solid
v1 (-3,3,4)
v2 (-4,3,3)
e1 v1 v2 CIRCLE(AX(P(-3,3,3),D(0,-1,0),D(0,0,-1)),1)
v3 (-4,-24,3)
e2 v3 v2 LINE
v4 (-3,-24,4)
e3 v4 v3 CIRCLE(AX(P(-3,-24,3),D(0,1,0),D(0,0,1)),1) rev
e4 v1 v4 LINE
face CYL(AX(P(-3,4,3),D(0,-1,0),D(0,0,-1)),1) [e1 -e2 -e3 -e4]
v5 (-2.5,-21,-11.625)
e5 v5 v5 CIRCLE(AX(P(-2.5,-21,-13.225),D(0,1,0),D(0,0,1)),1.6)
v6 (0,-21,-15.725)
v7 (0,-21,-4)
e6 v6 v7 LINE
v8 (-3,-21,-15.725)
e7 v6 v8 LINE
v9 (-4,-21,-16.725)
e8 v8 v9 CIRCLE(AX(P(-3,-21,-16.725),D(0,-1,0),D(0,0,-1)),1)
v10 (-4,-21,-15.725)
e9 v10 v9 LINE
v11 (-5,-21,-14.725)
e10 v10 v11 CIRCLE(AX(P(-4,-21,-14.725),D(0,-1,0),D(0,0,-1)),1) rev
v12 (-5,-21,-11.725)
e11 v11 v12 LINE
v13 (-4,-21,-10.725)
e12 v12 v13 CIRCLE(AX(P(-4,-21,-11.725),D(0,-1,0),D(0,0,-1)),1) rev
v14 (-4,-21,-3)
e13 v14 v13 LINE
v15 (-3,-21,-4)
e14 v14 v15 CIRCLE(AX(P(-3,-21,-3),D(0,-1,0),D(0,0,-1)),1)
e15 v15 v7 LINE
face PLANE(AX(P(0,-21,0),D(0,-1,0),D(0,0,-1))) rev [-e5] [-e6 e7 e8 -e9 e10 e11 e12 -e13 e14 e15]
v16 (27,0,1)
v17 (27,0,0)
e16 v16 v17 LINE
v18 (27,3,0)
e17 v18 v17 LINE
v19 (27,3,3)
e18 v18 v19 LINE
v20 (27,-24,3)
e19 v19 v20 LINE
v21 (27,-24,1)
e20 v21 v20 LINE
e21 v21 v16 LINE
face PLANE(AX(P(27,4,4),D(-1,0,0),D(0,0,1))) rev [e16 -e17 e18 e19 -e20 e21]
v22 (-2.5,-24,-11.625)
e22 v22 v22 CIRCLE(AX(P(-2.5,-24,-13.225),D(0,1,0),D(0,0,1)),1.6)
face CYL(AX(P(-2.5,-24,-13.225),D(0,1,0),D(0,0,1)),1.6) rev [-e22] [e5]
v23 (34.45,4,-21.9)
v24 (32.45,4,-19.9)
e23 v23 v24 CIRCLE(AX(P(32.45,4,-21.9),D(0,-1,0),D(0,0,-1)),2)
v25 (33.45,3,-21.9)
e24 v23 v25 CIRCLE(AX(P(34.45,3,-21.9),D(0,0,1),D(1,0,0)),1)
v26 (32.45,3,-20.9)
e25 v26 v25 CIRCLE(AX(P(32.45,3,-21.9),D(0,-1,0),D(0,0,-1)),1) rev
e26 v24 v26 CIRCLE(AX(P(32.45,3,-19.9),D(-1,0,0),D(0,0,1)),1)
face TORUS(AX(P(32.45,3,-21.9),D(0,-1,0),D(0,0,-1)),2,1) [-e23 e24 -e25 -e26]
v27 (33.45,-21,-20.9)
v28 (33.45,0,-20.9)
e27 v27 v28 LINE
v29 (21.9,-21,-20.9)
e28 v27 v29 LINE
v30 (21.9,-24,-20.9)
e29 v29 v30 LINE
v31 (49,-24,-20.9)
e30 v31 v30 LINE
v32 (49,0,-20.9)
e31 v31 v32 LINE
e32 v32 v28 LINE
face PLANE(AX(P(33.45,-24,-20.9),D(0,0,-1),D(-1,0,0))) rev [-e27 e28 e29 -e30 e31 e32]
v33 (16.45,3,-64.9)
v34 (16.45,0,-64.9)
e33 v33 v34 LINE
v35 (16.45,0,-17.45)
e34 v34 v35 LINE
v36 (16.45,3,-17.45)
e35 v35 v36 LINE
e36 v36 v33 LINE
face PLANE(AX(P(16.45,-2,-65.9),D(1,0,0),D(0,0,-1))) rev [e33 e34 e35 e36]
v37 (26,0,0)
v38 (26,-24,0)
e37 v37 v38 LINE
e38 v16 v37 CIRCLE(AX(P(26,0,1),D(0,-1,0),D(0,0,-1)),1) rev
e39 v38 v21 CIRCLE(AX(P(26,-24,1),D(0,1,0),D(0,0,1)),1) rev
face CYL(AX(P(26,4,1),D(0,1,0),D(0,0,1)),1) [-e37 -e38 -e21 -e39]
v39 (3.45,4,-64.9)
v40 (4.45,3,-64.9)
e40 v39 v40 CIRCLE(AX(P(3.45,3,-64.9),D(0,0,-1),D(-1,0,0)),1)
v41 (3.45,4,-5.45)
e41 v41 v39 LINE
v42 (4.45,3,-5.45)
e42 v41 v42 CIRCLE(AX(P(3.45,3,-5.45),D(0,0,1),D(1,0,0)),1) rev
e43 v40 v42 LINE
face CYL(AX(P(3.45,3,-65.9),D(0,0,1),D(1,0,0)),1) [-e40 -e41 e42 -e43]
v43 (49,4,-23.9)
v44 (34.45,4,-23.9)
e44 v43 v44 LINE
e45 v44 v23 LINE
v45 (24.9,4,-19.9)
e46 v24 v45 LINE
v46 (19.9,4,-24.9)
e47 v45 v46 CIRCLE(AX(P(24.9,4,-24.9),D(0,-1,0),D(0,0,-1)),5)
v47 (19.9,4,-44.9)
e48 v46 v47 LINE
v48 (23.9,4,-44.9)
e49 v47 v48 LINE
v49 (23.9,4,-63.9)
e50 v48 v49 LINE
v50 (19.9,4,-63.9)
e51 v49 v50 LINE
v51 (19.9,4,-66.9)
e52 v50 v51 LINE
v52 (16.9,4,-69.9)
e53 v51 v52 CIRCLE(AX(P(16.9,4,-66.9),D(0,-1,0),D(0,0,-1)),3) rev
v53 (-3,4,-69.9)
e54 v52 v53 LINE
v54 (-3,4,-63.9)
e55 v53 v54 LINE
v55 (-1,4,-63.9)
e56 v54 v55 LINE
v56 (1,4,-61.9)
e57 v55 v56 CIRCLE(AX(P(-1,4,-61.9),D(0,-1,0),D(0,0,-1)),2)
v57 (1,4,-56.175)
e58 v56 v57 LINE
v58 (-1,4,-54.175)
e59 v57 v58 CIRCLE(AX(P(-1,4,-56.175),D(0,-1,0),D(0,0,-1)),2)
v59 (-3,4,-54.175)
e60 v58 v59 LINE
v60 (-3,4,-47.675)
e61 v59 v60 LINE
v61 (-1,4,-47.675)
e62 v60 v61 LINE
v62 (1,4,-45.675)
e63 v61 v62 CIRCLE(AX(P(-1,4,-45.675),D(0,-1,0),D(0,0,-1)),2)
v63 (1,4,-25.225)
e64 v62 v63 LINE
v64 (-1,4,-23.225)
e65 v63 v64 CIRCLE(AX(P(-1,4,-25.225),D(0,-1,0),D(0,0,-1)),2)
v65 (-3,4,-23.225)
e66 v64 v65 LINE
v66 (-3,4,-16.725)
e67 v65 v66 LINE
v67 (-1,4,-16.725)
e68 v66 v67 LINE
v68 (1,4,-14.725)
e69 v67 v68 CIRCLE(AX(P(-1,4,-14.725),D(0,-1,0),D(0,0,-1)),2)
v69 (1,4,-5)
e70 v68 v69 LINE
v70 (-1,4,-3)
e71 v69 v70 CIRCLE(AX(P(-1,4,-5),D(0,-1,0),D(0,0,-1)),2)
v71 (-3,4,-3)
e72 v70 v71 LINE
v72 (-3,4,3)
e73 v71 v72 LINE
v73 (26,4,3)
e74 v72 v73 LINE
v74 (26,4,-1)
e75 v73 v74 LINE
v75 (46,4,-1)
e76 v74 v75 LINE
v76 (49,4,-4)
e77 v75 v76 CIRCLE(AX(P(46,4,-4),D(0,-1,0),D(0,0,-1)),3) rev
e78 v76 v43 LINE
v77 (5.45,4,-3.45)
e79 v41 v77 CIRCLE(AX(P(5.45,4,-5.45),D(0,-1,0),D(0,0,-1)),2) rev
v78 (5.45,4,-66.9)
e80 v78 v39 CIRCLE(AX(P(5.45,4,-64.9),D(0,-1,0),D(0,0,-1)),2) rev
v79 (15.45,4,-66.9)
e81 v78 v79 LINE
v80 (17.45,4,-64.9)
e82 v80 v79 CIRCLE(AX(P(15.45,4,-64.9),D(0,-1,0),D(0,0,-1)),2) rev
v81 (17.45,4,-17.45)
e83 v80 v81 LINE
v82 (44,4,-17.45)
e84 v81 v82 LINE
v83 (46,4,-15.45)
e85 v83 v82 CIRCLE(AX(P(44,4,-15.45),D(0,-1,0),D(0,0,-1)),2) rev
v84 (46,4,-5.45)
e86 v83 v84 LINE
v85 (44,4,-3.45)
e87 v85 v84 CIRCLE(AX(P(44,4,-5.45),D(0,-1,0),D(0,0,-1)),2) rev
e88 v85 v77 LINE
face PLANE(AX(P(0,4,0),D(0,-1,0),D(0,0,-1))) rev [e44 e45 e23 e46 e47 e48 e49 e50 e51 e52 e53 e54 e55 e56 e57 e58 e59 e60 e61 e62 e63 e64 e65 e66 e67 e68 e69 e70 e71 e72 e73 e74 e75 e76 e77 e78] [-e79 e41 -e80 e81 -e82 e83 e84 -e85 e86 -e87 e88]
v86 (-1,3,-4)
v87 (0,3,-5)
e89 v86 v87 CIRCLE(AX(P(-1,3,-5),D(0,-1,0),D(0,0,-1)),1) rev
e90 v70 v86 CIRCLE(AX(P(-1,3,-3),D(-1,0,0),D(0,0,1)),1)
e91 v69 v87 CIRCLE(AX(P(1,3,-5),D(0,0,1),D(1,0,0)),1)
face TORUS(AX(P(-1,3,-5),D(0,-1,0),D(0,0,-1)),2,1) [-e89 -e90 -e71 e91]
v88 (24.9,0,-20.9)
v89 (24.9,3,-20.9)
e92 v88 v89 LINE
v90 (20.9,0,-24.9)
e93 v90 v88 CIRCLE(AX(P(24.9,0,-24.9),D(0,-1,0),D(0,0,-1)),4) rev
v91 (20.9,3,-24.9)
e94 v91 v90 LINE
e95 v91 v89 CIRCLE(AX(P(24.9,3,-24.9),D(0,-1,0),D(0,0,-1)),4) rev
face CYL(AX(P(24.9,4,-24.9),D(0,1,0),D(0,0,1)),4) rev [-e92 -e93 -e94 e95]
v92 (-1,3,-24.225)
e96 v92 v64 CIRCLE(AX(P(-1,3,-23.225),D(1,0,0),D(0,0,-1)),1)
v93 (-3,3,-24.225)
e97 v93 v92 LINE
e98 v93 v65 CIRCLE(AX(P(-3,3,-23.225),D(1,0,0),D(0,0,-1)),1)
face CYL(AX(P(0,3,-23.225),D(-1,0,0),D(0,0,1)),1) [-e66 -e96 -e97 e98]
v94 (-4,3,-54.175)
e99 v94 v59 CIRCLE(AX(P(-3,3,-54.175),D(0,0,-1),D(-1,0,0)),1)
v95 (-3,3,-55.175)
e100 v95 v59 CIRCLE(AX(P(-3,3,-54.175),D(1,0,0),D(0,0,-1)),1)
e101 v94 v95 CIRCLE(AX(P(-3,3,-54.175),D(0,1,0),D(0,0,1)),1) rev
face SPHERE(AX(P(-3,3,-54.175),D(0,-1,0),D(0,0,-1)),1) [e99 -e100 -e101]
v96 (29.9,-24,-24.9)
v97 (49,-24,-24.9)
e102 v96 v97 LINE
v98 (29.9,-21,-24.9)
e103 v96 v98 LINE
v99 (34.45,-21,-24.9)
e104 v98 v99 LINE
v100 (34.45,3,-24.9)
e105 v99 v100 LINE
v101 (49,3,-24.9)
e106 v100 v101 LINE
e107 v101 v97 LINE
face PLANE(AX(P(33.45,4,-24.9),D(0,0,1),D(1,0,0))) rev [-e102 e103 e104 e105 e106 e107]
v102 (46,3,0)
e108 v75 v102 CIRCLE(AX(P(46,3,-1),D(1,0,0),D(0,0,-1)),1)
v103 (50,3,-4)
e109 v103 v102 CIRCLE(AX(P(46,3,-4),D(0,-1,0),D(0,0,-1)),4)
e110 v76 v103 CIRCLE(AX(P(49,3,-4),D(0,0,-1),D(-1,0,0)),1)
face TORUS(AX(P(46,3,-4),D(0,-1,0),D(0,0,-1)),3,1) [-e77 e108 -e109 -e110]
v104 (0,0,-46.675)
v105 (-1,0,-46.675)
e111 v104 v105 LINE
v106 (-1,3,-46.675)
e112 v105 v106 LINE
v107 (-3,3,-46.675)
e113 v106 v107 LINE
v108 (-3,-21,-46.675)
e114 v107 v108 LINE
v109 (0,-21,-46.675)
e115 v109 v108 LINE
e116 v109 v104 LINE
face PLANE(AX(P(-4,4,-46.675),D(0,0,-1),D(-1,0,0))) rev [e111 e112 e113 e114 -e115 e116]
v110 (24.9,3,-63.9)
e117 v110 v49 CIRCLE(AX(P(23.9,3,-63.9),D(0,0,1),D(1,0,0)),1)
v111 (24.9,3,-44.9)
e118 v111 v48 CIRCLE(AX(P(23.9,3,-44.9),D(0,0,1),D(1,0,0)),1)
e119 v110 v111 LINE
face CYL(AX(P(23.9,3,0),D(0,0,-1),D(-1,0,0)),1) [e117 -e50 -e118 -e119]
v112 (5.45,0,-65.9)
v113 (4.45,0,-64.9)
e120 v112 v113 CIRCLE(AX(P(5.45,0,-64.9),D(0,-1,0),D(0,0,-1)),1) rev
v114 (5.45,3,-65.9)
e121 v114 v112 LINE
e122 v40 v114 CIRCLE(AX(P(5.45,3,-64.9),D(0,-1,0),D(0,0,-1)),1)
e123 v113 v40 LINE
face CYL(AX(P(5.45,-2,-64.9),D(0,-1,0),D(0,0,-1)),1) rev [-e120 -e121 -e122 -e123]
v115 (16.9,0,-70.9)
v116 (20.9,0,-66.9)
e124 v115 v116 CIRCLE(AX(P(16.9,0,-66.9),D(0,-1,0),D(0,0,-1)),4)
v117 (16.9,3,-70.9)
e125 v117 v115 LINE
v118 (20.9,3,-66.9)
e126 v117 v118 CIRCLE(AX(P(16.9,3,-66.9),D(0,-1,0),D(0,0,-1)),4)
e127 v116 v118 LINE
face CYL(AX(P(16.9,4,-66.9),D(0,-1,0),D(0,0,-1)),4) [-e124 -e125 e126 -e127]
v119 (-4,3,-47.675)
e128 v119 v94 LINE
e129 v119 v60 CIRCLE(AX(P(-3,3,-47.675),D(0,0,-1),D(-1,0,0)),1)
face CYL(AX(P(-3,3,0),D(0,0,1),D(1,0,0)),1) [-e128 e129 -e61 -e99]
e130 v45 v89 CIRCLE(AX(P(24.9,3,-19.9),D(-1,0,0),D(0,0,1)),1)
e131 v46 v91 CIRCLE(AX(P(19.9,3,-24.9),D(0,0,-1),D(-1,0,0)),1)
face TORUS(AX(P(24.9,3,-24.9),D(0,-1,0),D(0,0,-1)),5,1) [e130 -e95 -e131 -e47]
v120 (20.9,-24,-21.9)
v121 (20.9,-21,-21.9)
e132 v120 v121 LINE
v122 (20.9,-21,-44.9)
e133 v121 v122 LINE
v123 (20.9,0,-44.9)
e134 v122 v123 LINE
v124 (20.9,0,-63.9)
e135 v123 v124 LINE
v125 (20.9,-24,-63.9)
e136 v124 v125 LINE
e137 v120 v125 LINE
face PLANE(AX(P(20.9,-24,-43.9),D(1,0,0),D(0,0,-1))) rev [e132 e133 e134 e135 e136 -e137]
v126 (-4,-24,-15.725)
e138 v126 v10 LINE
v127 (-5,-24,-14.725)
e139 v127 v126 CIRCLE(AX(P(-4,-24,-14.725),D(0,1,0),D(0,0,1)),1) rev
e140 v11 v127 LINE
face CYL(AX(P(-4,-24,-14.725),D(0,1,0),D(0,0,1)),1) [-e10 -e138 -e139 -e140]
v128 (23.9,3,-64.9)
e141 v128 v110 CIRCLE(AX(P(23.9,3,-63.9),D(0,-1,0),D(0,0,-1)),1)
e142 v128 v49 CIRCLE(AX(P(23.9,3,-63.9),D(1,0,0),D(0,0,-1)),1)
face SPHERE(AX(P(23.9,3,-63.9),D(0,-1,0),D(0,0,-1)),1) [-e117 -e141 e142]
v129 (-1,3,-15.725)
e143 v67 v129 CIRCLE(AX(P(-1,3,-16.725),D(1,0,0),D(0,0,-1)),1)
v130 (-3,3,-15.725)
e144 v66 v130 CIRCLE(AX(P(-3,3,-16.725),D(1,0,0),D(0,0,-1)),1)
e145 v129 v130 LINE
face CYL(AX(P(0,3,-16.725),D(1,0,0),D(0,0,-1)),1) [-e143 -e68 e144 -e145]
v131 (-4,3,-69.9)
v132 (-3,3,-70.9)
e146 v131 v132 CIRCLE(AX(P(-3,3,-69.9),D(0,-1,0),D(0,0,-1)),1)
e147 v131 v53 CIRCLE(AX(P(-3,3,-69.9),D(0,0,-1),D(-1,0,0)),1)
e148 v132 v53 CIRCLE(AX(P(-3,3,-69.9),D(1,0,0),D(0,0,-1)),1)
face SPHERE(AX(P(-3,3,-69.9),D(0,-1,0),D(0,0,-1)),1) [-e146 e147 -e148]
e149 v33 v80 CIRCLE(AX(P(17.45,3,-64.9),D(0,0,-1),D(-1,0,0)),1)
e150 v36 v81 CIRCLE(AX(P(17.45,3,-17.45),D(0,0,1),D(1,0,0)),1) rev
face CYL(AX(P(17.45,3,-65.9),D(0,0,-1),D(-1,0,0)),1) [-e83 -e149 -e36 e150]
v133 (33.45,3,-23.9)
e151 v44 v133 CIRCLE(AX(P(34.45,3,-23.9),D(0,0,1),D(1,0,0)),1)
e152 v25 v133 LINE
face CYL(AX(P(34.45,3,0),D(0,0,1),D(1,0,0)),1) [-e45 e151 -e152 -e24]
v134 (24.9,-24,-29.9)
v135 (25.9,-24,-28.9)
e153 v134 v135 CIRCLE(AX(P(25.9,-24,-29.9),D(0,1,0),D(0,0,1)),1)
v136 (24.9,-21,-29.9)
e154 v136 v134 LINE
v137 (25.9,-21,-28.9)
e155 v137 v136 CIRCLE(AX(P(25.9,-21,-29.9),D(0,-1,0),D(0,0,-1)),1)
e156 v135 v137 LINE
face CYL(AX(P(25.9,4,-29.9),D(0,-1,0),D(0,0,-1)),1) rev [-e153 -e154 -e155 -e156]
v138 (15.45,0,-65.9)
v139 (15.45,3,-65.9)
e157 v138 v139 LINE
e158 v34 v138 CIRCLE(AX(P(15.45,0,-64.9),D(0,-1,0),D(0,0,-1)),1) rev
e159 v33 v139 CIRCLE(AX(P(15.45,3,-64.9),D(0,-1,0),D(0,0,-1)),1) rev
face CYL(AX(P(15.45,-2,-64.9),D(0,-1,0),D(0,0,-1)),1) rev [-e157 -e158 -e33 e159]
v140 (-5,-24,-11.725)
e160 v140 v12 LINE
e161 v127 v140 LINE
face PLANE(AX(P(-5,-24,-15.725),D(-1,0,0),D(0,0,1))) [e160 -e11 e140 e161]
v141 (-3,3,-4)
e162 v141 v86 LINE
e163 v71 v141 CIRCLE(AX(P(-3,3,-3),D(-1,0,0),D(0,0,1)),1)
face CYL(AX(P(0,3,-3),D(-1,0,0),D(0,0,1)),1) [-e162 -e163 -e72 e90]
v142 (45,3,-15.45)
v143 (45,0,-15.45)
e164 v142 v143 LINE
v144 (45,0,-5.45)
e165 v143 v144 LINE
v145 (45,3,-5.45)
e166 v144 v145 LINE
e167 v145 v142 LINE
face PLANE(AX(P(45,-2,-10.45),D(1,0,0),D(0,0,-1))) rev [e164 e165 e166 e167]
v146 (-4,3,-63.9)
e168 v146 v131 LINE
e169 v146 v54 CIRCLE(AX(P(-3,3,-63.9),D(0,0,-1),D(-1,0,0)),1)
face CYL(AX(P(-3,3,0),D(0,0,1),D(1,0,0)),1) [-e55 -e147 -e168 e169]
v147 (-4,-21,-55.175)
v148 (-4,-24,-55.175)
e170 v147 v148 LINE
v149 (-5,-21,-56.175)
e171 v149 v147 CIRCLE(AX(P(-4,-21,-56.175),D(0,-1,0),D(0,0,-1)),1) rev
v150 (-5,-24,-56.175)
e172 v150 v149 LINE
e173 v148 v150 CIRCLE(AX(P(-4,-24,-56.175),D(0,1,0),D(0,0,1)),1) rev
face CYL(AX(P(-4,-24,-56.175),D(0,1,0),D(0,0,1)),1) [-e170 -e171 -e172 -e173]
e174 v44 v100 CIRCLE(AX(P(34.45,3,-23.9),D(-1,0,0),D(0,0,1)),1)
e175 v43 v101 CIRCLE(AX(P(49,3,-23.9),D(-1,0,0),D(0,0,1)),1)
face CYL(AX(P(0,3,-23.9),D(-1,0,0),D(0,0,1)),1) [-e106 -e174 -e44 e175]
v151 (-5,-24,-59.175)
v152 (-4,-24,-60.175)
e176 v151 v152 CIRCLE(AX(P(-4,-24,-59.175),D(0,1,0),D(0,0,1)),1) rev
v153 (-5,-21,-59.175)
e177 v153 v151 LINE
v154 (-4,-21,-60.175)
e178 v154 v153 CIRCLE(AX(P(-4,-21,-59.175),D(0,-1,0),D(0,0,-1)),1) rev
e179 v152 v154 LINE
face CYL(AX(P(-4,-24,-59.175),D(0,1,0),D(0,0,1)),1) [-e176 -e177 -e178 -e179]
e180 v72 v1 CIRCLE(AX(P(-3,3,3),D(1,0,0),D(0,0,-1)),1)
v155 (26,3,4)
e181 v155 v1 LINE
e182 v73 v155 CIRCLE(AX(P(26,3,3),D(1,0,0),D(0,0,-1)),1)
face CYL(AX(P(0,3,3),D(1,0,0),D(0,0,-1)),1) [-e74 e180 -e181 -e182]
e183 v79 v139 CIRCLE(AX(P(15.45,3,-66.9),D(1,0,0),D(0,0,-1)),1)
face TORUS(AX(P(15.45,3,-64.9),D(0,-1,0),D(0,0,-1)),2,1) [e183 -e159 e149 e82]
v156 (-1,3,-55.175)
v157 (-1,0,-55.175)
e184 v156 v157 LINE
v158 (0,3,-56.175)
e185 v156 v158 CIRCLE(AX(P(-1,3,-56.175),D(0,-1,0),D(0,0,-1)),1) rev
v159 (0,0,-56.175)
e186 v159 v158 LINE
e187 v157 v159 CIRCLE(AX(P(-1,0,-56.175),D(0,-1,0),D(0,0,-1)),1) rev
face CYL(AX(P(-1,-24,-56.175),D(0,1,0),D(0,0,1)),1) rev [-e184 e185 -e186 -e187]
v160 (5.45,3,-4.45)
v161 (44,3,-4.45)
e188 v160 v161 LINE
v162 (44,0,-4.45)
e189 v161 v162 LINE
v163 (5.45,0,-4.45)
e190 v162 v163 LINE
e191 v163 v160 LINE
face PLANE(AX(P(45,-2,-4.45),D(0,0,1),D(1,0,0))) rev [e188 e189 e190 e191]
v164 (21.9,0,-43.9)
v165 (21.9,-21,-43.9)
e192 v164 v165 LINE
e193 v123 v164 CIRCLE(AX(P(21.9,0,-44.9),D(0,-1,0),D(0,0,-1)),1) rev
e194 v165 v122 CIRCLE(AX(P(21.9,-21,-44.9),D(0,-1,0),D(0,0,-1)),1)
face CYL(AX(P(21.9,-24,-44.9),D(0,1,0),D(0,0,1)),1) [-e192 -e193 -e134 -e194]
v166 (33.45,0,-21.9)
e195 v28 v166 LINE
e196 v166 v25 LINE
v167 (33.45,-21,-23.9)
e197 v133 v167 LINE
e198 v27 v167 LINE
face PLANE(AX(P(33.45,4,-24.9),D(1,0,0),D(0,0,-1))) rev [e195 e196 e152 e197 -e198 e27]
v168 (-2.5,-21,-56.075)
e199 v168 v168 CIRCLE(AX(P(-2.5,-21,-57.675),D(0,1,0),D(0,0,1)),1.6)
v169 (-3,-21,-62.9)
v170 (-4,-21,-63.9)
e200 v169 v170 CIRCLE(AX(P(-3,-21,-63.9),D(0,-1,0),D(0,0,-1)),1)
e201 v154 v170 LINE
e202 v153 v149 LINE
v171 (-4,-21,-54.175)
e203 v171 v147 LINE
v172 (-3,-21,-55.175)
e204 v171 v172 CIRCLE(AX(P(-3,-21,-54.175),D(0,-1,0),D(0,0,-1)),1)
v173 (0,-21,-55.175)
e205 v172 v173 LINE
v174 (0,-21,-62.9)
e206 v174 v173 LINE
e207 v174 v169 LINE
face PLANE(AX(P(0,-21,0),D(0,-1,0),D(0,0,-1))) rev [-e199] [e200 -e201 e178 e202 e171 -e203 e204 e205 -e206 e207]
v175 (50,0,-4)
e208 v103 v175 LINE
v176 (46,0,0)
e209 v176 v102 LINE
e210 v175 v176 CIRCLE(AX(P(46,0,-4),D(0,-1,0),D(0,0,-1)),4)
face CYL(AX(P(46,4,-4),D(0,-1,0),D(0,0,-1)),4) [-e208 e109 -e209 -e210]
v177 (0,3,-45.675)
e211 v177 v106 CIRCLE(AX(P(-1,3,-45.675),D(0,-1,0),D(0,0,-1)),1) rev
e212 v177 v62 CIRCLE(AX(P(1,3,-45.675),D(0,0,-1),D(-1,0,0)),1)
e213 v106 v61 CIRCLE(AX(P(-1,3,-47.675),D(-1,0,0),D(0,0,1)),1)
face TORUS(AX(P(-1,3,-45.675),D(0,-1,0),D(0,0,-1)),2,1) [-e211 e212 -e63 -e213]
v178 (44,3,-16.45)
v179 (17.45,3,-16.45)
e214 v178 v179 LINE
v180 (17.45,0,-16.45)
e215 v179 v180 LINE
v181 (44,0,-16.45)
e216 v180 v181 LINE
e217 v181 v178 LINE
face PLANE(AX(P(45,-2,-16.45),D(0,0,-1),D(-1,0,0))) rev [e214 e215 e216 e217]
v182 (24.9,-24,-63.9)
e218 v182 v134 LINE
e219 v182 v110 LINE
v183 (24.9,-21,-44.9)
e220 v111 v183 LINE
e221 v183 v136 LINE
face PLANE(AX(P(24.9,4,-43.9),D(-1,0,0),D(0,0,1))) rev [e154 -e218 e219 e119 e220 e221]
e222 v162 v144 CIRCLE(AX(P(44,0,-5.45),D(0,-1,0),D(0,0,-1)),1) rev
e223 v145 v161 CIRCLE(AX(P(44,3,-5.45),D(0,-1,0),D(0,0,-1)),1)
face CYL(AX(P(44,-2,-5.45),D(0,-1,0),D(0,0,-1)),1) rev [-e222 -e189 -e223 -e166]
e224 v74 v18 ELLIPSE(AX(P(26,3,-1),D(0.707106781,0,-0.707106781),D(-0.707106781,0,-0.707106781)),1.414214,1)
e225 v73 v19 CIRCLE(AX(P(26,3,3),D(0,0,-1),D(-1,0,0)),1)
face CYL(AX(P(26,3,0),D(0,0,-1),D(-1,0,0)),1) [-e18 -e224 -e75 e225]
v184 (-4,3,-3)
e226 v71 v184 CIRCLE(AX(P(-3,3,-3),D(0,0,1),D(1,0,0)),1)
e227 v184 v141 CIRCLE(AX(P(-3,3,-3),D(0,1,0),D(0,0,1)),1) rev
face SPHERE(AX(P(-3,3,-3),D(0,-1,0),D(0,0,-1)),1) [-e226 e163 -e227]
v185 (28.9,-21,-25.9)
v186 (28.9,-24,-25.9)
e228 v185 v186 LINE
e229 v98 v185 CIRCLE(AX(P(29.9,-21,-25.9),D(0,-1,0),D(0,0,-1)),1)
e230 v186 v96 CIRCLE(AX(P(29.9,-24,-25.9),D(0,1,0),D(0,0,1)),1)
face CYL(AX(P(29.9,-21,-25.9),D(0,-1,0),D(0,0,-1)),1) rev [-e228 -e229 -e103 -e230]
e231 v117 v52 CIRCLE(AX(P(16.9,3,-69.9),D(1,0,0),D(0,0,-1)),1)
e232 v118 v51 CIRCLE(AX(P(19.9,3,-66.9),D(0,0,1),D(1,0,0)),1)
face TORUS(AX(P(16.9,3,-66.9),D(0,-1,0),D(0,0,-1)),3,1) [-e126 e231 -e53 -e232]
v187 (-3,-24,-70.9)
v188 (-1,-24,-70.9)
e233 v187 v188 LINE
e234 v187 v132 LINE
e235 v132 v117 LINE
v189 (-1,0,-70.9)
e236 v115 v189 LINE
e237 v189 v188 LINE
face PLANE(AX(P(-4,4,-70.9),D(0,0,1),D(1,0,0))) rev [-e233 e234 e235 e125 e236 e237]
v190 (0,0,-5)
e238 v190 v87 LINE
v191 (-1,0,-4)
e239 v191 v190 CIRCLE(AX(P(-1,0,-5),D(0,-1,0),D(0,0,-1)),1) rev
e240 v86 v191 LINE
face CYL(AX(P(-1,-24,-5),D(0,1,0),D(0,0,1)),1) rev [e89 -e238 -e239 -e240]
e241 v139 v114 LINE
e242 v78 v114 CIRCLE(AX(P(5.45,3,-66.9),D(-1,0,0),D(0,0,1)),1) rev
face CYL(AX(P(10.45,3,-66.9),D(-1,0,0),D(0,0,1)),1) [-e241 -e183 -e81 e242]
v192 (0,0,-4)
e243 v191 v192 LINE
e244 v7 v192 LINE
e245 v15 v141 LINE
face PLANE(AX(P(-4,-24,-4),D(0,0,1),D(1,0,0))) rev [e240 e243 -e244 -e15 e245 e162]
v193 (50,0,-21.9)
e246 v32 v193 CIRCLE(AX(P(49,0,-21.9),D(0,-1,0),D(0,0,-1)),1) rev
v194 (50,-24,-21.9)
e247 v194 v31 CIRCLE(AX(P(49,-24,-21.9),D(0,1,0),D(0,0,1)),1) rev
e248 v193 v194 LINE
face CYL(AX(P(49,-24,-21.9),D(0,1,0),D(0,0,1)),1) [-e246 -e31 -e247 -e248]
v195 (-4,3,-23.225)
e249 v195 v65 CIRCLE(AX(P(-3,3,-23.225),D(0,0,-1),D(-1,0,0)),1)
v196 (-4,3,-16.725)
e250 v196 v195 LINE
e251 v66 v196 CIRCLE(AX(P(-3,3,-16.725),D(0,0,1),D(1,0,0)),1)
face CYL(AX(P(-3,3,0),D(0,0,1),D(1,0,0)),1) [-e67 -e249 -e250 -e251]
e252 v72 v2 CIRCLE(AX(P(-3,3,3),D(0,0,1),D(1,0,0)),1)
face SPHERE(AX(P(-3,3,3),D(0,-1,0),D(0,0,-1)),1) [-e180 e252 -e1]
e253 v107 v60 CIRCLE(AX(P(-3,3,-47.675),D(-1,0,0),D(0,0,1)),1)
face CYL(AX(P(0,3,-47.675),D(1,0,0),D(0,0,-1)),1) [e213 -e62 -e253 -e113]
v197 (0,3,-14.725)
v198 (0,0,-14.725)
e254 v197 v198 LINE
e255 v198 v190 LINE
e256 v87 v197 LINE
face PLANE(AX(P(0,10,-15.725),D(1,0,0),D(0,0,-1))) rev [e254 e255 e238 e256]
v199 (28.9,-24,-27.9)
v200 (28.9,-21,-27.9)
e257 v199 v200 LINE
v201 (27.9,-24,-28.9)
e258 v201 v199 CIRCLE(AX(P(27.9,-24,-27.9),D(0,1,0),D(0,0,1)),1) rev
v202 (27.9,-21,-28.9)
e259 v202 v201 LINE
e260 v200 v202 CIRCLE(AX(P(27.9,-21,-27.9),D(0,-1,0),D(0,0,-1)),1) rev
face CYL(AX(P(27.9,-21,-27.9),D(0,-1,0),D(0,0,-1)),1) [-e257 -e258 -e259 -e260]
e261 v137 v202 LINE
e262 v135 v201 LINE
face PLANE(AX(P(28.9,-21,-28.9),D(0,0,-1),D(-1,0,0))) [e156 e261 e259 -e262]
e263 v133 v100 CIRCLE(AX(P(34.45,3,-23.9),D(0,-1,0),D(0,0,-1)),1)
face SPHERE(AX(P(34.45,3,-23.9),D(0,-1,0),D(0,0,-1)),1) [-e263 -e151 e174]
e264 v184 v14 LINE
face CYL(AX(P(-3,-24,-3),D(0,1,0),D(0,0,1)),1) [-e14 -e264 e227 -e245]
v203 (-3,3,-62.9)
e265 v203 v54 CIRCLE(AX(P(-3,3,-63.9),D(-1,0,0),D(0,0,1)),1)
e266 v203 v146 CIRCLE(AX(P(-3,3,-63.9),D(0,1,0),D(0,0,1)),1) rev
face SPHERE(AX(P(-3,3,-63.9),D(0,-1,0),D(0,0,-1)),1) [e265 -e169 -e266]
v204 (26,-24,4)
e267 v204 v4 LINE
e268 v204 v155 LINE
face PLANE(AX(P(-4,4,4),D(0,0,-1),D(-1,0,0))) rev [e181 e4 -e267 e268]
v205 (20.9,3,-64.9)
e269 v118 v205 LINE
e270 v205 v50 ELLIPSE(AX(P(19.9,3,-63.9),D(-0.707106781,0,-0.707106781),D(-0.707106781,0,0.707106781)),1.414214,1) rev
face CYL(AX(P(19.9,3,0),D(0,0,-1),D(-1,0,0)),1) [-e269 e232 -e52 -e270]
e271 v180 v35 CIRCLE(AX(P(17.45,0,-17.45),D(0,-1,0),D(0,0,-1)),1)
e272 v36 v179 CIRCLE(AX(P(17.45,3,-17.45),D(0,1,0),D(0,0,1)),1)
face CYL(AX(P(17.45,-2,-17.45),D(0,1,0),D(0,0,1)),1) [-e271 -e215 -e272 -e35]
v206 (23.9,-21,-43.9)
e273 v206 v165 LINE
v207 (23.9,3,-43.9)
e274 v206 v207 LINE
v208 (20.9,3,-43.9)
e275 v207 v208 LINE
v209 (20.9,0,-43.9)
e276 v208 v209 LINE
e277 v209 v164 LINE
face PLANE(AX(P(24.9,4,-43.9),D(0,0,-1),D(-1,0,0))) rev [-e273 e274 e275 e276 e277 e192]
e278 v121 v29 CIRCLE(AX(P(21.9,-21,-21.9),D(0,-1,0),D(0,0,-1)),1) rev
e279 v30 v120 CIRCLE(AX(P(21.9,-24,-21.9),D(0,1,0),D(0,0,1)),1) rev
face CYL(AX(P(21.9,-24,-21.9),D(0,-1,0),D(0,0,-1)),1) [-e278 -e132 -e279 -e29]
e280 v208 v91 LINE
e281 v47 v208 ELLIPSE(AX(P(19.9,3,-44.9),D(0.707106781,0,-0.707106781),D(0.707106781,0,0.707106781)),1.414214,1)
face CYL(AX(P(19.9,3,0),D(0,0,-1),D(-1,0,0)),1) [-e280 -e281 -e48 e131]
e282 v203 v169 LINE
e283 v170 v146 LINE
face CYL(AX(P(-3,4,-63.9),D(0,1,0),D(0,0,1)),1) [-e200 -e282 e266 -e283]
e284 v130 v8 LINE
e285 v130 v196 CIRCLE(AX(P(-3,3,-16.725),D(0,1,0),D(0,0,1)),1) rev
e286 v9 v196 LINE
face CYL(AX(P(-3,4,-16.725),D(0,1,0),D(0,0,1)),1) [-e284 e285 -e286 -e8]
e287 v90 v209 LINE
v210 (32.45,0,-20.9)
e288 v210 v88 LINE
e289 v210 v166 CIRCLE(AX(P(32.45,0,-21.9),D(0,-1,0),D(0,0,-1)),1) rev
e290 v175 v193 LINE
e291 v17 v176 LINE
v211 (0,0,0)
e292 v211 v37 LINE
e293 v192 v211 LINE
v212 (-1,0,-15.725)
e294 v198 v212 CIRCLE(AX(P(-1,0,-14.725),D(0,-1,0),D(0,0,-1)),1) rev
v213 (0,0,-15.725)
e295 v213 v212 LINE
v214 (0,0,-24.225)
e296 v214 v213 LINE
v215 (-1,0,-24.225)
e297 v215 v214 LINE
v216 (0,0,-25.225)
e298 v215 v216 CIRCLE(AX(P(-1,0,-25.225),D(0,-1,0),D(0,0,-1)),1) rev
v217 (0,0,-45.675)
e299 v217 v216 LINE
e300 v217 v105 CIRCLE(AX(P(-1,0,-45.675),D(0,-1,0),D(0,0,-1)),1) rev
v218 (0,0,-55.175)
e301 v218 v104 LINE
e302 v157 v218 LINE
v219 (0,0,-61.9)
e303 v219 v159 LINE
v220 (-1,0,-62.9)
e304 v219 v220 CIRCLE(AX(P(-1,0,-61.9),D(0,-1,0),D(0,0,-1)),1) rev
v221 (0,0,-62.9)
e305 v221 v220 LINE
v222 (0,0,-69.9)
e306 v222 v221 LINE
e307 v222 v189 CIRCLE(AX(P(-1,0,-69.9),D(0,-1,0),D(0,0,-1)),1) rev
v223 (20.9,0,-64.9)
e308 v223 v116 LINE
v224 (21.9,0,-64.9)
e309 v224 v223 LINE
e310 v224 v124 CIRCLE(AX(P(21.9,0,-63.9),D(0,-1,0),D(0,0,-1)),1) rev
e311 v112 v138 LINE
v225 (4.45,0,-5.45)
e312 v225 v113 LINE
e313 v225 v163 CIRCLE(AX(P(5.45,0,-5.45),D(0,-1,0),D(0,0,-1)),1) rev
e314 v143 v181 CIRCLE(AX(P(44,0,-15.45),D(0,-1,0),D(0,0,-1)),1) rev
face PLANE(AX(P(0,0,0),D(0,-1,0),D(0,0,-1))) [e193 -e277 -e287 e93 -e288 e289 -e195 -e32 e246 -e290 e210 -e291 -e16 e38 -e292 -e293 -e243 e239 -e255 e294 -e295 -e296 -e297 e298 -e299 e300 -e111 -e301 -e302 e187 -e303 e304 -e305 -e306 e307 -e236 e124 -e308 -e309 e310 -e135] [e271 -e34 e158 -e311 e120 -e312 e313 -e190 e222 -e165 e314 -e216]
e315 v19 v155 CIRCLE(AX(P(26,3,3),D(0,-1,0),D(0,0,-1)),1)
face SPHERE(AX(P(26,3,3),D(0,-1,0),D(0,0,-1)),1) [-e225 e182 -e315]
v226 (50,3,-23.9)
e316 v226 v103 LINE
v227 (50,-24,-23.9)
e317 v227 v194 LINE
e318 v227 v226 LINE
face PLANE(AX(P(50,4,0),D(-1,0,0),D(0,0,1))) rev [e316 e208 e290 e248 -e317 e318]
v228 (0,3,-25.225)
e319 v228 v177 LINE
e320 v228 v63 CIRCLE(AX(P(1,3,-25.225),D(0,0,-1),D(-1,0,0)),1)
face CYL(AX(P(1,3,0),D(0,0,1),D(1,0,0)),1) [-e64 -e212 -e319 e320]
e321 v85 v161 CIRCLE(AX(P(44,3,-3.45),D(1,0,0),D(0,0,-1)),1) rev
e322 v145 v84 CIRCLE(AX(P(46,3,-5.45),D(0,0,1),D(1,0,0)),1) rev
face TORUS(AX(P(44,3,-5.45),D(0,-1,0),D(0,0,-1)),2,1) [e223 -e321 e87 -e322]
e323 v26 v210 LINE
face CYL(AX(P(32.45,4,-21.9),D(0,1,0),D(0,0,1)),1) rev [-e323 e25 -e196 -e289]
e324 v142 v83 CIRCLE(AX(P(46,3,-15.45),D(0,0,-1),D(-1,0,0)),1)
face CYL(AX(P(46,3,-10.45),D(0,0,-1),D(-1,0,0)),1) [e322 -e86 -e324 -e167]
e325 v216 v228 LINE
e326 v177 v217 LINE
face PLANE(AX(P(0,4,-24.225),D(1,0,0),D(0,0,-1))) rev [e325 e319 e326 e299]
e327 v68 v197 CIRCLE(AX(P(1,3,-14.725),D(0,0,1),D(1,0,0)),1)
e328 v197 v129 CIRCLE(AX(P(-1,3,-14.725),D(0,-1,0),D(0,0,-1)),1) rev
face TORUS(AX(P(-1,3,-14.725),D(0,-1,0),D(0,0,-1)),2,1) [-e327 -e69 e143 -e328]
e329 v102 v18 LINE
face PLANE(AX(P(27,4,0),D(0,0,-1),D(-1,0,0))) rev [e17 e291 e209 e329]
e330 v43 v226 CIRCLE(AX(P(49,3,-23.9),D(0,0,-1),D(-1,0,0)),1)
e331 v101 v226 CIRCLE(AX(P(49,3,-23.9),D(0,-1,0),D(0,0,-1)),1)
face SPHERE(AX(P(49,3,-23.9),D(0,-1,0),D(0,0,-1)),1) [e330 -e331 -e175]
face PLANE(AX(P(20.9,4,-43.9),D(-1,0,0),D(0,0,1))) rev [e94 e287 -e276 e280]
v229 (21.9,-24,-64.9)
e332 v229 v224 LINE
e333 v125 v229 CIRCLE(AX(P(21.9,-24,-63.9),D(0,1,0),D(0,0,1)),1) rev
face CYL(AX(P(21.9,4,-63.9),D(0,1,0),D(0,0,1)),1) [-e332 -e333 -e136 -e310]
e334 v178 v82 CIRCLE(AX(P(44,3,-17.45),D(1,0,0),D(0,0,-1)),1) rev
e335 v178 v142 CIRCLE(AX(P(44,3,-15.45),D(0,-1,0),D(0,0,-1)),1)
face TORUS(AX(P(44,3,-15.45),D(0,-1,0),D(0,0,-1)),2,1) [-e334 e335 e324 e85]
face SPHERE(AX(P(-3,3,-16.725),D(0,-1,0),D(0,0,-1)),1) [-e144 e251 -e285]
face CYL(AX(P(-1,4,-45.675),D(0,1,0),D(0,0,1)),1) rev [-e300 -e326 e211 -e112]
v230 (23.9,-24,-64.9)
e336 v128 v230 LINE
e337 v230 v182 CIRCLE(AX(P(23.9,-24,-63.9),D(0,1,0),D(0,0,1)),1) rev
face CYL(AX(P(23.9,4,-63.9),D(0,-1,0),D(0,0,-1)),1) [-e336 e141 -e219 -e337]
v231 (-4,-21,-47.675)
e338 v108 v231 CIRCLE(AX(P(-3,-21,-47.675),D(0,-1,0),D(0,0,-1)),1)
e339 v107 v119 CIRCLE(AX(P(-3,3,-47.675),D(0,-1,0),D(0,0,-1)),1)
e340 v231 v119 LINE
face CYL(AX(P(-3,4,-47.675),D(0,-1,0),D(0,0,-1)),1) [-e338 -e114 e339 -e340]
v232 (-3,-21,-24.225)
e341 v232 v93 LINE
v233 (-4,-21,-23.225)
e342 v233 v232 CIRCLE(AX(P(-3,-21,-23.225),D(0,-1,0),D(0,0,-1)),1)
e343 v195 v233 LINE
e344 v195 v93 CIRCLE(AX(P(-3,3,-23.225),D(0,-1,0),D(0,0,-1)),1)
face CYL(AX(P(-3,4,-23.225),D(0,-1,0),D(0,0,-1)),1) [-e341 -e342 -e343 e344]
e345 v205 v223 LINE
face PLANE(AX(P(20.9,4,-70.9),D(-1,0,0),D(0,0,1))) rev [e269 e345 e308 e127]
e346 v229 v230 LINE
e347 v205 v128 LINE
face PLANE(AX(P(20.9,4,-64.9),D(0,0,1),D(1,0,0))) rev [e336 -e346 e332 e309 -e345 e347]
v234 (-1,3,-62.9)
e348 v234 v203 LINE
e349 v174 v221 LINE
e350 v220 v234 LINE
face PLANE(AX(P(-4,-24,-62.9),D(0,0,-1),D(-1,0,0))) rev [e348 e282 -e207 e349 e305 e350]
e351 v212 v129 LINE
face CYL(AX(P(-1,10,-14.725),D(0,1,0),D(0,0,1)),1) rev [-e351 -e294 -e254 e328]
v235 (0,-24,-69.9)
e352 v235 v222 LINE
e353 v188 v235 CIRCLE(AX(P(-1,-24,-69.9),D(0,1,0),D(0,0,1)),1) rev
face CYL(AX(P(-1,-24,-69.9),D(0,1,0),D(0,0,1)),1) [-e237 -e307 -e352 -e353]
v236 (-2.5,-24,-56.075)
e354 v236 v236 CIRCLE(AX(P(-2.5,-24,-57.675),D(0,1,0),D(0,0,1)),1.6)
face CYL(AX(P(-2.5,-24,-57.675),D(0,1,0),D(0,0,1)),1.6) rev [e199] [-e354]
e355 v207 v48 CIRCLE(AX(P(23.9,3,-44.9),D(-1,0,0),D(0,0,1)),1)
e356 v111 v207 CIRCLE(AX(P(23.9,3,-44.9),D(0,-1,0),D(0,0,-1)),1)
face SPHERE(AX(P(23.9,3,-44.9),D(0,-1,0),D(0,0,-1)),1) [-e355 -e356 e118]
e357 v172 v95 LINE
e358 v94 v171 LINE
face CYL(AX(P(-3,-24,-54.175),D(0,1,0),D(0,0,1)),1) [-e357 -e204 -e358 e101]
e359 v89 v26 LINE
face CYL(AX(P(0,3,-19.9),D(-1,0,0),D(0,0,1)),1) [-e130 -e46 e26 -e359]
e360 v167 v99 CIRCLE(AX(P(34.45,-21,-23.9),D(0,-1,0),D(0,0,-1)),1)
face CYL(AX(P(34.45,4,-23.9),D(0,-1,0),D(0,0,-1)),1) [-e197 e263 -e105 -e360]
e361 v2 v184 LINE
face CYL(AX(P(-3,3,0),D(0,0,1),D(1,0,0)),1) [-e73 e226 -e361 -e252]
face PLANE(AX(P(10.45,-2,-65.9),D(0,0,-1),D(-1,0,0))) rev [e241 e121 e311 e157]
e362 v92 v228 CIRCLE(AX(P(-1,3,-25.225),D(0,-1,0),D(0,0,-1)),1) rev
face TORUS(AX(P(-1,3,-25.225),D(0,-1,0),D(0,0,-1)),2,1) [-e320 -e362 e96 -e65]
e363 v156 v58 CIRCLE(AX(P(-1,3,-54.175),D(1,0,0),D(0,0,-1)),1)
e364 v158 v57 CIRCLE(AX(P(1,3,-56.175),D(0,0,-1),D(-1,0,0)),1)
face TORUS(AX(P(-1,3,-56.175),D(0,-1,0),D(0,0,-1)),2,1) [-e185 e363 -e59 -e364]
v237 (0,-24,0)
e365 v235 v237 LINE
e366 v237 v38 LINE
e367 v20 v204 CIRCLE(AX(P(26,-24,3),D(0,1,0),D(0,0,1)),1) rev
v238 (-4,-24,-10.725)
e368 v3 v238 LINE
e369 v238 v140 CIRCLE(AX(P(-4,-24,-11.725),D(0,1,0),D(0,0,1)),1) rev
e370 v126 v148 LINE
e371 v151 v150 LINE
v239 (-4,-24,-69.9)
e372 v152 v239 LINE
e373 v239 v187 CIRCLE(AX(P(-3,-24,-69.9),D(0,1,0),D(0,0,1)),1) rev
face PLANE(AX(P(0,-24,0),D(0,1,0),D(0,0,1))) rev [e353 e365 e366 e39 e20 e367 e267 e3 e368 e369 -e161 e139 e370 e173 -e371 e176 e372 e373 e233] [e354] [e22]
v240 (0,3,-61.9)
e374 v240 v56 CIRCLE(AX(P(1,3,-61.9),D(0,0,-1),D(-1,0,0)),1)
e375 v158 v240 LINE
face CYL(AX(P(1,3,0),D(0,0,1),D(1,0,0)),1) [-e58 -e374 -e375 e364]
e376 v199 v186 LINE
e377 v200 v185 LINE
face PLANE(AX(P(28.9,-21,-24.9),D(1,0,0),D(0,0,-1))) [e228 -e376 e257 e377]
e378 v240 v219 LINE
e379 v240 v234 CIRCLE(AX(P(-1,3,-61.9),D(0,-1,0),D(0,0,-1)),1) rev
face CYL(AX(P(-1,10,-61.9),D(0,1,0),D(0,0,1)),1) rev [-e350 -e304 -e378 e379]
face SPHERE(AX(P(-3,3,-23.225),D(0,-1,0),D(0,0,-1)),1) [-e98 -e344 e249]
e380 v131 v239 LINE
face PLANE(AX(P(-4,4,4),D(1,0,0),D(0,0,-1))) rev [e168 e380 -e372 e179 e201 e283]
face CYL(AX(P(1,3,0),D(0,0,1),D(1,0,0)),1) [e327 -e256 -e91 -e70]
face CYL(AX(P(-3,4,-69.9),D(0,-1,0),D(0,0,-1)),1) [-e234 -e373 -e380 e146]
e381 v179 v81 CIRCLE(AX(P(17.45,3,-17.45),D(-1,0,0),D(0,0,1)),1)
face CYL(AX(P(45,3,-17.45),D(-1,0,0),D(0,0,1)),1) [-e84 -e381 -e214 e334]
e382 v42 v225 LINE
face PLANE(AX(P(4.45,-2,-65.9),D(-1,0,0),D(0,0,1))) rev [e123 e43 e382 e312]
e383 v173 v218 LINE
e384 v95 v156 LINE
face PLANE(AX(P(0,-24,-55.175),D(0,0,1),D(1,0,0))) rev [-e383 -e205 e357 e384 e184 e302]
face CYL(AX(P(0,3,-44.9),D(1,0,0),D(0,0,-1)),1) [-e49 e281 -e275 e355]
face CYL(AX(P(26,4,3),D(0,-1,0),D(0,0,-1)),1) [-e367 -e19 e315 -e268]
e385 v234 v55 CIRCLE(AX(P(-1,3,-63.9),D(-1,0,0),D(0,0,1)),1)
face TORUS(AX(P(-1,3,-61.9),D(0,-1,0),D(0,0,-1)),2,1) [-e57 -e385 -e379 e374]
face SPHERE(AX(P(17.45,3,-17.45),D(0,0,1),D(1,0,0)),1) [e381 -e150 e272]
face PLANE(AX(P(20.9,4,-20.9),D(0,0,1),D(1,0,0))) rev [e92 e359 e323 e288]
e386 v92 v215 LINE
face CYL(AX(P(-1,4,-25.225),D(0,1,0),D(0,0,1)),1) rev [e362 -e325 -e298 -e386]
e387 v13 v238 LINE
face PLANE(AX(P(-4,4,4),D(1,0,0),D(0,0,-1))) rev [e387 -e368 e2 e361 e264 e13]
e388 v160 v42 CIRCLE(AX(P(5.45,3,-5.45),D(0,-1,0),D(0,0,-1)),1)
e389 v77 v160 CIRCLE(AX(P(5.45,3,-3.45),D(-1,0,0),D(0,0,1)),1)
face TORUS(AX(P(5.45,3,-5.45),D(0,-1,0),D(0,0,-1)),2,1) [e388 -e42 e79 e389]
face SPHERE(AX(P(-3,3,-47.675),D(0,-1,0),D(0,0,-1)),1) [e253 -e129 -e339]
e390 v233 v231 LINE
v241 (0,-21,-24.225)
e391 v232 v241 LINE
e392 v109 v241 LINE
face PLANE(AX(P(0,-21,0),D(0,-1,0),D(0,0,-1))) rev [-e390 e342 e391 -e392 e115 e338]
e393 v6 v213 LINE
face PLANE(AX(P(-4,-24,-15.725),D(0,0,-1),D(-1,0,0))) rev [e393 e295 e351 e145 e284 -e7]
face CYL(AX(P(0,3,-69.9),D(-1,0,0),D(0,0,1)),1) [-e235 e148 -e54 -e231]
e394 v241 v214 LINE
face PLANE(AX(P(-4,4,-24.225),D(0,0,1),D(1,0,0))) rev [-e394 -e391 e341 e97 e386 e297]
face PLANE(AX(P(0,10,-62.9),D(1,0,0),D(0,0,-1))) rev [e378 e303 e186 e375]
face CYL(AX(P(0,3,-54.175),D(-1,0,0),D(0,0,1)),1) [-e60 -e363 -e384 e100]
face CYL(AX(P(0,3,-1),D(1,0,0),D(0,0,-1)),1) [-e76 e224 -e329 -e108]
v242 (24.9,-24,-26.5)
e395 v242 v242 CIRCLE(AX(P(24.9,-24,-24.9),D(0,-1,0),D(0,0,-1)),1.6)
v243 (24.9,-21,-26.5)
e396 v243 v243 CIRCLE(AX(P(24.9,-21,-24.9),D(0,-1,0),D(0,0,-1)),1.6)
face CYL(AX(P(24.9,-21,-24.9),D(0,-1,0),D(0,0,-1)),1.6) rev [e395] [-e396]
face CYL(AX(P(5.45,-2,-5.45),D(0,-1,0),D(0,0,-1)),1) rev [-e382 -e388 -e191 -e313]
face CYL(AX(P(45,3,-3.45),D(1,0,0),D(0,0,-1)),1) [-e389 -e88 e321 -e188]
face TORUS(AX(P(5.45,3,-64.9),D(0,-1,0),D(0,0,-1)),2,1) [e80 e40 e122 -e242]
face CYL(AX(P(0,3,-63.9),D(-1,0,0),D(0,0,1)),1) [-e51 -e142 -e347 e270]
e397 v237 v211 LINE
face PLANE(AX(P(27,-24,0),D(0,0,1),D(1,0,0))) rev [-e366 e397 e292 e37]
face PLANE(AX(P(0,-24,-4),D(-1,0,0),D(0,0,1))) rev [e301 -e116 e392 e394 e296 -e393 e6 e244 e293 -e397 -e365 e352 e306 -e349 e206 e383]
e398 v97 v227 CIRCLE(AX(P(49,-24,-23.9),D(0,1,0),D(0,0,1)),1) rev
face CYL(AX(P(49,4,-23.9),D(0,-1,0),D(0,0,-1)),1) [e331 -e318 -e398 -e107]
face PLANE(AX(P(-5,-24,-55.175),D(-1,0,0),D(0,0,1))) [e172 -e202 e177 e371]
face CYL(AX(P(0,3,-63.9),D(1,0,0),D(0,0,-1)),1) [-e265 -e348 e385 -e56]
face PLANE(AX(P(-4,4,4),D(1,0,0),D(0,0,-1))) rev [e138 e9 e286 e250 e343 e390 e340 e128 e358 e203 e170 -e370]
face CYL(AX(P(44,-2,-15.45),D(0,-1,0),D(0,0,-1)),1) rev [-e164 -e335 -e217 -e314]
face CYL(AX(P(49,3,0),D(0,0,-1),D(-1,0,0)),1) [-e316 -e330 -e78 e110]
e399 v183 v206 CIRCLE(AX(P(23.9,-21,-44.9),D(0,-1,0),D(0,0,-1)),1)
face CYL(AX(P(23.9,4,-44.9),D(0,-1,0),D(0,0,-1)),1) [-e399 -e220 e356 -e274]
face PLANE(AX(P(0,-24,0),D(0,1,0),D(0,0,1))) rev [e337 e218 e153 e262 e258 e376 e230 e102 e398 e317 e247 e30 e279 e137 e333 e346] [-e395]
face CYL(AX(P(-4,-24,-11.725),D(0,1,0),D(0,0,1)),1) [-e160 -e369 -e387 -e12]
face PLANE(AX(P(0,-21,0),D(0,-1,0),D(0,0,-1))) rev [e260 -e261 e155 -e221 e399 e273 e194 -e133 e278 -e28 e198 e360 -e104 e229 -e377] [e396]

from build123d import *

# Parameters (mm, degrees)
BOSS_EXTRUDE1_DEPTH = 4
SKETCH2_W           = 16.55
SKETCH2_H           = 4
SKETCH2_W_2         = 4
SKETCH2_H_2         = 21
SKETCH2_H_3         = 8.5
SKETCH2_H_4         = 8
BOSS_EXTRUDE2_DEPTH = 24
FILLET2_R           = 4
BOSS_EXTRUDE3_DEPTH = 3
SKETCH7_R           = 1.6
BOSS_EXTRUDE4_DEPTH = 3
SKETCH8_W           = 5
SKETCH8_H           = 5
BOSS_EXTRUDE5_DEPTH = 3
SKETCH9_R           = 1.6
CUT_EXTRUDE1_DEPTH  = 3
CUT_EXTRUDE2_DEPTH  = 6
SKETCH11_W          = 4
SKETCH11_H          = 11.725
SKETCH11_H_2        = 7.725
CUT_EXTRUDE3_DEPTH  = 10
FILLET3_R           = 1
FILLET4_R           = 1
FILLET5_R           = 1
FILLET6_R           = 1


with BuildPart() as part:
    # Sketch1 → Boss-Extrude1 (new body)
    with BuildSketch(Plane(origin=(0, 0, 0), x_dir=(1, 0, 0), z_dir=(0, 1, 0))):
        Polygon((20.9, 20.9), (33.45, 20.9), (33.45, 24.9), (50, 24.9), (50, 0), (27, 0), (27, -4), (-4, -4), (-4, 19.725), (-4, 24.225), (0, 24.225), (0, 35.45), (0, 46.675), (-4, 46.675), (-4, 51.175), (-4, 70.9), (20.9, 70.9), (20.9, 64.9), (24.9, 64.9), (24.9, 43.9), (20.9, 43.9), align=None)
    extrude(amount=BOSS_EXTRUDE1_DEPTH)

    # Sketch2 → Boss-Extrude2 (add)
    with BuildSketch(Plane.XZ):
        Polygon((27, 0), (23, 0), (0, 0), (0, -4), (-4, -4), (-4, 4), (23, 4), (27, 4), align=None)
        with Locations((41.725, -22.9)):
            Rectangle(SKETCH2_W, SKETCH2_H)
        with Locations((22.9, -54.4)):
            Rectangle(SKETCH2_W_2, SKETCH2_H_2)
        with Locations((-2, -19.975)):
            Rectangle(SKETCH2_W_2, SKETCH2_H_3)
        with Locations((-2, -50.925)):
            Rectangle(SKETCH2_W_2, SKETCH2_H_3)
        with Locations((-2, -66.9)):
            Rectangle(SKETCH2_W_2, SKETCH2_H_4)
    extrude(amount=BOSS_EXTRUDE2_DEPTH)

    # Fillet2
    fillet2_edges = [part.edges().sort_by_distance(p)[0] for p in [
        (20.9, 2, -20.9),
        (50, 2, 0),
        (20.9, 2, -70.9),
    ]]
    fillet(fillet2_edges, radius=FILLET2_R)

    # Sketch5 → Boss-Extrude3 (add)
    with BuildSketch(Plane(origin=(0, -24, 0), x_dir=(-1, 0, 0), z_dir=(0, -1, 0))):
        Polygon((0, 19.725), (0, 0), (-27, 0), (-27, -4), (4, -4), (4, 51.175), (4, 70.9), (0, 70.9), align=None)
    extrude(amount=-BOSS_EXTRUDE3_DEPTH)

    # Sketch7 → Boss-Extrude4 (add)
    with BuildSketch(Plane.XZ.offset(24)):
        Polygon((24.9, -47.9), (24.9, -34.9), (24.9, -28.9), (28.9, -28.9), (28.9, -24.9), (33.45, -24.9), (37.45, -24.9), (37.45, -20.9), (20.9, -20.9), (20.9, -47.9), align=None)
        with Locations(Location((24.9, -24.9, 0), (0, 0, 270))):
            Circle(SKETCH7_R, mode=Mode.SUBTRACT)
    extrude(amount=-BOSS_EXTRUDE4_DEPTH)

    # Sketch8 → Boss-Extrude5 (add)
    with BuildSketch(Plane(origin=(0, -21, 0), x_dir=(1, 0, 0), z_dir=(0, 1, 0))):
        with Locations((-2.5, 13.225)):
            Rectangle(SKETCH8_W, SKETCH8_H)
        with Locations((-2.5, 57.675)):
            Rectangle(SKETCH8_W, SKETCH8_H)
    extrude(amount=-BOSS_EXTRUDE5_DEPTH)

    # Sketch9 → Cut-Extrude1 (cut)
    with BuildSketch(Plane(origin=(0, -21, 0), x_dir=(1, 0, 0), z_dir=(0, 1, 0))):
        with Locations(Location((-2.5, 57.675, 0), (0, 0, 270))):
            Circle(SKETCH9_R)
        with Locations(Location((-2.5, 13.225, 0), (0, 0, 270))):
            Circle(SKETCH9_R)
    extrude(amount=-CUT_EXTRUDE1_DEPTH, mode=Mode.SUBTRACT)

    # Sketch10 → Cut-Extrude2 (cut)
    with BuildSketch(Plane(origin=(0, 4, 0), x_dir=(1, 0, 0), z_dir=(0, 1, 0))):
        Polygon((10.45, 65.9), (16.45, 65.9), (16.45, 16.45), (45, 16.45), (45, 10.45), (45, 4.45), (4.45, 4.45), (4.45, 65.9), align=None)
    extrude(amount=-CUT_EXTRUDE2_DEPTH, mode=Mode.SUBTRACT)

    # Sketch11 → Cut-Extrude3 (cut)
    with BuildSketch(Plane(origin=(0, 0, 0), x_dir=(-1, 0, 0), z_dir=(0, -1, 0))):
        with Locations((2, 9.8625)):
            Rectangle(SKETCH11_W, SKETCH11_H)
        with Locations((2, 59.0375)):
            Rectangle(SKETCH11_W, SKETCH11_H_2)
    extrude(amount=-CUT_EXTRUDE3_DEPTH, mode=Mode.SUBTRACT)

    # Fillet3
    fillet3_edges = [part.edges().sort_by_distance(p)[0] for p in [
        (-4, -8.5, -15.725),
        (-4, -8.5, -55.175),
        (-4, -8.5, -62.9),
        (-4, -8.5, -4),
        (20.9, -10.5, -43.9),
        (20.9, -22.5, -20.9),
        (24.9, -8.5, -43.9),
        (33.45, 2, -20.9),
        (33.45, -8.5, -24.9),
        (50, -10, -24.9),
        (27, -10, 4),
        (-4, -10, 4),
        (-4, -8.5, -24.225),
        (0, 2, -24.225),
        (0, 2, -46.675),
        (-4, -8.5, -46.675),
        (-4, -10, -70.9),
        (24.9, -10, -64.9),
        (0, 2, -15.725),
        (0, 2, -4),
        (0, 2, -62.9),
        (0, 2, -55.175),
        (27, -12, 0),
        (50, -12, -20.9),
        (0, -12, -70.9),
        (20.9, -12, -64.9),
    ]]
    fillet(fillet3_edges, radius=FILLET3_R)

    # Fillet4
    fillet4_edges = [part.edges().sort_by_distance(p)[0] for p in [
        (22.4, 4, -43.9),
        (20.9, 4, -34.4),
        (28.675, 4, -20.9),
        (33.157106781, 4, -21.192893219),
        (33.45, 4, -22.9),
        (33.742893219, 4, -24.607106781),
        (41.725, 4, -24.9),
        (36.5, 4, 0),
        (27, 4, 1.5),
        (-3.707106781, 4, -3.707106781),
        (-2, 4, -4),
        (-0.292893219, 4, -4.292893219),
        (0, 4, -9.8625),
        (-0.292893219, 4, -15.432106781),
        (-2, 4, -15.725),
        (-3.707106781, 4, -16.017893219),
        (0, 4, -35.45),
        (-3.707106781, 4, -54.882106781),
        (-2, 4, -55.175),
        (-0.292893219, 4, -55.467893219),
        (0, 4, -59.0375),
        (-0.292893219, 4, -62.607106781),
        (-2, 4, -62.9),
        (-3.707106781, 4, -63.192893219),
        (10.45, 4, -65.9),
        (4.45, 4, -35.175),
        (30.725, 4, -16.45),
        (45, 4, -10.45),
        (24.725, 4, -4.45),
        (16.45, 4, -41.175),
        (16.45, 2, -65.9),
        (4.45, 2, -65.9),
        (4.45, 2, -4.45),
        (45, 2, -4.45),
        (45, 2, -16.45),
        (16.45, 2, -16.45),
        (20.9, 4, -65.9),
        (19.728427125, 4, -69.728427125),
        (-4, 4, 0),
        (24.9, 4, -54.4),
        (6.95, 4, -70.9),
        (11.5, 4, 4),
        (-3.707106781, 4, -70.607106781),
        (-3.707106781, 4, 3.707106781),
        (22.4, 4, -64.9),
        (24.607106781, 4, -64.607106781),
        (24.607106781, 4, -44.192893219),
        (22.071572875, 4, -22.071572875),
        (49.707106781, 4, -24.607106781),
        (50, 4, -13.95),
        (48.828427125, 4, -1.171572875),
        (26.707106781, 4, 3.707106781),
        (-2, 4, -46.675),
        (-3.707106781, 4, -46.967893219),
        (-2, 4, -24.225),
        (-3.707106781, 4, -23.932106781),
        (-0.292893219, 4, -46.382106781),
        (-0.292893219, 4, -24.517893219),
    ]]
    fillet(fillet4_edges, radius=FILLET4_R)

    # Fillet5
    fillet5_edges = [part.edges().sort_by_distance(p)[0] for p in [
        (-5, -22.5, -60.175),
        (-5, -22.5, -55.175),
        (-5, -22.5, -15.725),
        (-5, -22.5, -10.725),
    ]]
    fillet(fillet5_edges, radius=FILLET5_R - 0.0001)  # a hair under: the kernel refuses the full size

    # Fillet6
    fillet6_edges = [part.edges().sort_by_distance(p)[0] for p in [
        (24.9, -22.5, -28.9),
        (28.9, -22.5, -24.9),
        (28.9, -22.5, -28.9),
    ]]
    fillet(fillet6_edges, radius=FILLET6_R)


solid = part.part
